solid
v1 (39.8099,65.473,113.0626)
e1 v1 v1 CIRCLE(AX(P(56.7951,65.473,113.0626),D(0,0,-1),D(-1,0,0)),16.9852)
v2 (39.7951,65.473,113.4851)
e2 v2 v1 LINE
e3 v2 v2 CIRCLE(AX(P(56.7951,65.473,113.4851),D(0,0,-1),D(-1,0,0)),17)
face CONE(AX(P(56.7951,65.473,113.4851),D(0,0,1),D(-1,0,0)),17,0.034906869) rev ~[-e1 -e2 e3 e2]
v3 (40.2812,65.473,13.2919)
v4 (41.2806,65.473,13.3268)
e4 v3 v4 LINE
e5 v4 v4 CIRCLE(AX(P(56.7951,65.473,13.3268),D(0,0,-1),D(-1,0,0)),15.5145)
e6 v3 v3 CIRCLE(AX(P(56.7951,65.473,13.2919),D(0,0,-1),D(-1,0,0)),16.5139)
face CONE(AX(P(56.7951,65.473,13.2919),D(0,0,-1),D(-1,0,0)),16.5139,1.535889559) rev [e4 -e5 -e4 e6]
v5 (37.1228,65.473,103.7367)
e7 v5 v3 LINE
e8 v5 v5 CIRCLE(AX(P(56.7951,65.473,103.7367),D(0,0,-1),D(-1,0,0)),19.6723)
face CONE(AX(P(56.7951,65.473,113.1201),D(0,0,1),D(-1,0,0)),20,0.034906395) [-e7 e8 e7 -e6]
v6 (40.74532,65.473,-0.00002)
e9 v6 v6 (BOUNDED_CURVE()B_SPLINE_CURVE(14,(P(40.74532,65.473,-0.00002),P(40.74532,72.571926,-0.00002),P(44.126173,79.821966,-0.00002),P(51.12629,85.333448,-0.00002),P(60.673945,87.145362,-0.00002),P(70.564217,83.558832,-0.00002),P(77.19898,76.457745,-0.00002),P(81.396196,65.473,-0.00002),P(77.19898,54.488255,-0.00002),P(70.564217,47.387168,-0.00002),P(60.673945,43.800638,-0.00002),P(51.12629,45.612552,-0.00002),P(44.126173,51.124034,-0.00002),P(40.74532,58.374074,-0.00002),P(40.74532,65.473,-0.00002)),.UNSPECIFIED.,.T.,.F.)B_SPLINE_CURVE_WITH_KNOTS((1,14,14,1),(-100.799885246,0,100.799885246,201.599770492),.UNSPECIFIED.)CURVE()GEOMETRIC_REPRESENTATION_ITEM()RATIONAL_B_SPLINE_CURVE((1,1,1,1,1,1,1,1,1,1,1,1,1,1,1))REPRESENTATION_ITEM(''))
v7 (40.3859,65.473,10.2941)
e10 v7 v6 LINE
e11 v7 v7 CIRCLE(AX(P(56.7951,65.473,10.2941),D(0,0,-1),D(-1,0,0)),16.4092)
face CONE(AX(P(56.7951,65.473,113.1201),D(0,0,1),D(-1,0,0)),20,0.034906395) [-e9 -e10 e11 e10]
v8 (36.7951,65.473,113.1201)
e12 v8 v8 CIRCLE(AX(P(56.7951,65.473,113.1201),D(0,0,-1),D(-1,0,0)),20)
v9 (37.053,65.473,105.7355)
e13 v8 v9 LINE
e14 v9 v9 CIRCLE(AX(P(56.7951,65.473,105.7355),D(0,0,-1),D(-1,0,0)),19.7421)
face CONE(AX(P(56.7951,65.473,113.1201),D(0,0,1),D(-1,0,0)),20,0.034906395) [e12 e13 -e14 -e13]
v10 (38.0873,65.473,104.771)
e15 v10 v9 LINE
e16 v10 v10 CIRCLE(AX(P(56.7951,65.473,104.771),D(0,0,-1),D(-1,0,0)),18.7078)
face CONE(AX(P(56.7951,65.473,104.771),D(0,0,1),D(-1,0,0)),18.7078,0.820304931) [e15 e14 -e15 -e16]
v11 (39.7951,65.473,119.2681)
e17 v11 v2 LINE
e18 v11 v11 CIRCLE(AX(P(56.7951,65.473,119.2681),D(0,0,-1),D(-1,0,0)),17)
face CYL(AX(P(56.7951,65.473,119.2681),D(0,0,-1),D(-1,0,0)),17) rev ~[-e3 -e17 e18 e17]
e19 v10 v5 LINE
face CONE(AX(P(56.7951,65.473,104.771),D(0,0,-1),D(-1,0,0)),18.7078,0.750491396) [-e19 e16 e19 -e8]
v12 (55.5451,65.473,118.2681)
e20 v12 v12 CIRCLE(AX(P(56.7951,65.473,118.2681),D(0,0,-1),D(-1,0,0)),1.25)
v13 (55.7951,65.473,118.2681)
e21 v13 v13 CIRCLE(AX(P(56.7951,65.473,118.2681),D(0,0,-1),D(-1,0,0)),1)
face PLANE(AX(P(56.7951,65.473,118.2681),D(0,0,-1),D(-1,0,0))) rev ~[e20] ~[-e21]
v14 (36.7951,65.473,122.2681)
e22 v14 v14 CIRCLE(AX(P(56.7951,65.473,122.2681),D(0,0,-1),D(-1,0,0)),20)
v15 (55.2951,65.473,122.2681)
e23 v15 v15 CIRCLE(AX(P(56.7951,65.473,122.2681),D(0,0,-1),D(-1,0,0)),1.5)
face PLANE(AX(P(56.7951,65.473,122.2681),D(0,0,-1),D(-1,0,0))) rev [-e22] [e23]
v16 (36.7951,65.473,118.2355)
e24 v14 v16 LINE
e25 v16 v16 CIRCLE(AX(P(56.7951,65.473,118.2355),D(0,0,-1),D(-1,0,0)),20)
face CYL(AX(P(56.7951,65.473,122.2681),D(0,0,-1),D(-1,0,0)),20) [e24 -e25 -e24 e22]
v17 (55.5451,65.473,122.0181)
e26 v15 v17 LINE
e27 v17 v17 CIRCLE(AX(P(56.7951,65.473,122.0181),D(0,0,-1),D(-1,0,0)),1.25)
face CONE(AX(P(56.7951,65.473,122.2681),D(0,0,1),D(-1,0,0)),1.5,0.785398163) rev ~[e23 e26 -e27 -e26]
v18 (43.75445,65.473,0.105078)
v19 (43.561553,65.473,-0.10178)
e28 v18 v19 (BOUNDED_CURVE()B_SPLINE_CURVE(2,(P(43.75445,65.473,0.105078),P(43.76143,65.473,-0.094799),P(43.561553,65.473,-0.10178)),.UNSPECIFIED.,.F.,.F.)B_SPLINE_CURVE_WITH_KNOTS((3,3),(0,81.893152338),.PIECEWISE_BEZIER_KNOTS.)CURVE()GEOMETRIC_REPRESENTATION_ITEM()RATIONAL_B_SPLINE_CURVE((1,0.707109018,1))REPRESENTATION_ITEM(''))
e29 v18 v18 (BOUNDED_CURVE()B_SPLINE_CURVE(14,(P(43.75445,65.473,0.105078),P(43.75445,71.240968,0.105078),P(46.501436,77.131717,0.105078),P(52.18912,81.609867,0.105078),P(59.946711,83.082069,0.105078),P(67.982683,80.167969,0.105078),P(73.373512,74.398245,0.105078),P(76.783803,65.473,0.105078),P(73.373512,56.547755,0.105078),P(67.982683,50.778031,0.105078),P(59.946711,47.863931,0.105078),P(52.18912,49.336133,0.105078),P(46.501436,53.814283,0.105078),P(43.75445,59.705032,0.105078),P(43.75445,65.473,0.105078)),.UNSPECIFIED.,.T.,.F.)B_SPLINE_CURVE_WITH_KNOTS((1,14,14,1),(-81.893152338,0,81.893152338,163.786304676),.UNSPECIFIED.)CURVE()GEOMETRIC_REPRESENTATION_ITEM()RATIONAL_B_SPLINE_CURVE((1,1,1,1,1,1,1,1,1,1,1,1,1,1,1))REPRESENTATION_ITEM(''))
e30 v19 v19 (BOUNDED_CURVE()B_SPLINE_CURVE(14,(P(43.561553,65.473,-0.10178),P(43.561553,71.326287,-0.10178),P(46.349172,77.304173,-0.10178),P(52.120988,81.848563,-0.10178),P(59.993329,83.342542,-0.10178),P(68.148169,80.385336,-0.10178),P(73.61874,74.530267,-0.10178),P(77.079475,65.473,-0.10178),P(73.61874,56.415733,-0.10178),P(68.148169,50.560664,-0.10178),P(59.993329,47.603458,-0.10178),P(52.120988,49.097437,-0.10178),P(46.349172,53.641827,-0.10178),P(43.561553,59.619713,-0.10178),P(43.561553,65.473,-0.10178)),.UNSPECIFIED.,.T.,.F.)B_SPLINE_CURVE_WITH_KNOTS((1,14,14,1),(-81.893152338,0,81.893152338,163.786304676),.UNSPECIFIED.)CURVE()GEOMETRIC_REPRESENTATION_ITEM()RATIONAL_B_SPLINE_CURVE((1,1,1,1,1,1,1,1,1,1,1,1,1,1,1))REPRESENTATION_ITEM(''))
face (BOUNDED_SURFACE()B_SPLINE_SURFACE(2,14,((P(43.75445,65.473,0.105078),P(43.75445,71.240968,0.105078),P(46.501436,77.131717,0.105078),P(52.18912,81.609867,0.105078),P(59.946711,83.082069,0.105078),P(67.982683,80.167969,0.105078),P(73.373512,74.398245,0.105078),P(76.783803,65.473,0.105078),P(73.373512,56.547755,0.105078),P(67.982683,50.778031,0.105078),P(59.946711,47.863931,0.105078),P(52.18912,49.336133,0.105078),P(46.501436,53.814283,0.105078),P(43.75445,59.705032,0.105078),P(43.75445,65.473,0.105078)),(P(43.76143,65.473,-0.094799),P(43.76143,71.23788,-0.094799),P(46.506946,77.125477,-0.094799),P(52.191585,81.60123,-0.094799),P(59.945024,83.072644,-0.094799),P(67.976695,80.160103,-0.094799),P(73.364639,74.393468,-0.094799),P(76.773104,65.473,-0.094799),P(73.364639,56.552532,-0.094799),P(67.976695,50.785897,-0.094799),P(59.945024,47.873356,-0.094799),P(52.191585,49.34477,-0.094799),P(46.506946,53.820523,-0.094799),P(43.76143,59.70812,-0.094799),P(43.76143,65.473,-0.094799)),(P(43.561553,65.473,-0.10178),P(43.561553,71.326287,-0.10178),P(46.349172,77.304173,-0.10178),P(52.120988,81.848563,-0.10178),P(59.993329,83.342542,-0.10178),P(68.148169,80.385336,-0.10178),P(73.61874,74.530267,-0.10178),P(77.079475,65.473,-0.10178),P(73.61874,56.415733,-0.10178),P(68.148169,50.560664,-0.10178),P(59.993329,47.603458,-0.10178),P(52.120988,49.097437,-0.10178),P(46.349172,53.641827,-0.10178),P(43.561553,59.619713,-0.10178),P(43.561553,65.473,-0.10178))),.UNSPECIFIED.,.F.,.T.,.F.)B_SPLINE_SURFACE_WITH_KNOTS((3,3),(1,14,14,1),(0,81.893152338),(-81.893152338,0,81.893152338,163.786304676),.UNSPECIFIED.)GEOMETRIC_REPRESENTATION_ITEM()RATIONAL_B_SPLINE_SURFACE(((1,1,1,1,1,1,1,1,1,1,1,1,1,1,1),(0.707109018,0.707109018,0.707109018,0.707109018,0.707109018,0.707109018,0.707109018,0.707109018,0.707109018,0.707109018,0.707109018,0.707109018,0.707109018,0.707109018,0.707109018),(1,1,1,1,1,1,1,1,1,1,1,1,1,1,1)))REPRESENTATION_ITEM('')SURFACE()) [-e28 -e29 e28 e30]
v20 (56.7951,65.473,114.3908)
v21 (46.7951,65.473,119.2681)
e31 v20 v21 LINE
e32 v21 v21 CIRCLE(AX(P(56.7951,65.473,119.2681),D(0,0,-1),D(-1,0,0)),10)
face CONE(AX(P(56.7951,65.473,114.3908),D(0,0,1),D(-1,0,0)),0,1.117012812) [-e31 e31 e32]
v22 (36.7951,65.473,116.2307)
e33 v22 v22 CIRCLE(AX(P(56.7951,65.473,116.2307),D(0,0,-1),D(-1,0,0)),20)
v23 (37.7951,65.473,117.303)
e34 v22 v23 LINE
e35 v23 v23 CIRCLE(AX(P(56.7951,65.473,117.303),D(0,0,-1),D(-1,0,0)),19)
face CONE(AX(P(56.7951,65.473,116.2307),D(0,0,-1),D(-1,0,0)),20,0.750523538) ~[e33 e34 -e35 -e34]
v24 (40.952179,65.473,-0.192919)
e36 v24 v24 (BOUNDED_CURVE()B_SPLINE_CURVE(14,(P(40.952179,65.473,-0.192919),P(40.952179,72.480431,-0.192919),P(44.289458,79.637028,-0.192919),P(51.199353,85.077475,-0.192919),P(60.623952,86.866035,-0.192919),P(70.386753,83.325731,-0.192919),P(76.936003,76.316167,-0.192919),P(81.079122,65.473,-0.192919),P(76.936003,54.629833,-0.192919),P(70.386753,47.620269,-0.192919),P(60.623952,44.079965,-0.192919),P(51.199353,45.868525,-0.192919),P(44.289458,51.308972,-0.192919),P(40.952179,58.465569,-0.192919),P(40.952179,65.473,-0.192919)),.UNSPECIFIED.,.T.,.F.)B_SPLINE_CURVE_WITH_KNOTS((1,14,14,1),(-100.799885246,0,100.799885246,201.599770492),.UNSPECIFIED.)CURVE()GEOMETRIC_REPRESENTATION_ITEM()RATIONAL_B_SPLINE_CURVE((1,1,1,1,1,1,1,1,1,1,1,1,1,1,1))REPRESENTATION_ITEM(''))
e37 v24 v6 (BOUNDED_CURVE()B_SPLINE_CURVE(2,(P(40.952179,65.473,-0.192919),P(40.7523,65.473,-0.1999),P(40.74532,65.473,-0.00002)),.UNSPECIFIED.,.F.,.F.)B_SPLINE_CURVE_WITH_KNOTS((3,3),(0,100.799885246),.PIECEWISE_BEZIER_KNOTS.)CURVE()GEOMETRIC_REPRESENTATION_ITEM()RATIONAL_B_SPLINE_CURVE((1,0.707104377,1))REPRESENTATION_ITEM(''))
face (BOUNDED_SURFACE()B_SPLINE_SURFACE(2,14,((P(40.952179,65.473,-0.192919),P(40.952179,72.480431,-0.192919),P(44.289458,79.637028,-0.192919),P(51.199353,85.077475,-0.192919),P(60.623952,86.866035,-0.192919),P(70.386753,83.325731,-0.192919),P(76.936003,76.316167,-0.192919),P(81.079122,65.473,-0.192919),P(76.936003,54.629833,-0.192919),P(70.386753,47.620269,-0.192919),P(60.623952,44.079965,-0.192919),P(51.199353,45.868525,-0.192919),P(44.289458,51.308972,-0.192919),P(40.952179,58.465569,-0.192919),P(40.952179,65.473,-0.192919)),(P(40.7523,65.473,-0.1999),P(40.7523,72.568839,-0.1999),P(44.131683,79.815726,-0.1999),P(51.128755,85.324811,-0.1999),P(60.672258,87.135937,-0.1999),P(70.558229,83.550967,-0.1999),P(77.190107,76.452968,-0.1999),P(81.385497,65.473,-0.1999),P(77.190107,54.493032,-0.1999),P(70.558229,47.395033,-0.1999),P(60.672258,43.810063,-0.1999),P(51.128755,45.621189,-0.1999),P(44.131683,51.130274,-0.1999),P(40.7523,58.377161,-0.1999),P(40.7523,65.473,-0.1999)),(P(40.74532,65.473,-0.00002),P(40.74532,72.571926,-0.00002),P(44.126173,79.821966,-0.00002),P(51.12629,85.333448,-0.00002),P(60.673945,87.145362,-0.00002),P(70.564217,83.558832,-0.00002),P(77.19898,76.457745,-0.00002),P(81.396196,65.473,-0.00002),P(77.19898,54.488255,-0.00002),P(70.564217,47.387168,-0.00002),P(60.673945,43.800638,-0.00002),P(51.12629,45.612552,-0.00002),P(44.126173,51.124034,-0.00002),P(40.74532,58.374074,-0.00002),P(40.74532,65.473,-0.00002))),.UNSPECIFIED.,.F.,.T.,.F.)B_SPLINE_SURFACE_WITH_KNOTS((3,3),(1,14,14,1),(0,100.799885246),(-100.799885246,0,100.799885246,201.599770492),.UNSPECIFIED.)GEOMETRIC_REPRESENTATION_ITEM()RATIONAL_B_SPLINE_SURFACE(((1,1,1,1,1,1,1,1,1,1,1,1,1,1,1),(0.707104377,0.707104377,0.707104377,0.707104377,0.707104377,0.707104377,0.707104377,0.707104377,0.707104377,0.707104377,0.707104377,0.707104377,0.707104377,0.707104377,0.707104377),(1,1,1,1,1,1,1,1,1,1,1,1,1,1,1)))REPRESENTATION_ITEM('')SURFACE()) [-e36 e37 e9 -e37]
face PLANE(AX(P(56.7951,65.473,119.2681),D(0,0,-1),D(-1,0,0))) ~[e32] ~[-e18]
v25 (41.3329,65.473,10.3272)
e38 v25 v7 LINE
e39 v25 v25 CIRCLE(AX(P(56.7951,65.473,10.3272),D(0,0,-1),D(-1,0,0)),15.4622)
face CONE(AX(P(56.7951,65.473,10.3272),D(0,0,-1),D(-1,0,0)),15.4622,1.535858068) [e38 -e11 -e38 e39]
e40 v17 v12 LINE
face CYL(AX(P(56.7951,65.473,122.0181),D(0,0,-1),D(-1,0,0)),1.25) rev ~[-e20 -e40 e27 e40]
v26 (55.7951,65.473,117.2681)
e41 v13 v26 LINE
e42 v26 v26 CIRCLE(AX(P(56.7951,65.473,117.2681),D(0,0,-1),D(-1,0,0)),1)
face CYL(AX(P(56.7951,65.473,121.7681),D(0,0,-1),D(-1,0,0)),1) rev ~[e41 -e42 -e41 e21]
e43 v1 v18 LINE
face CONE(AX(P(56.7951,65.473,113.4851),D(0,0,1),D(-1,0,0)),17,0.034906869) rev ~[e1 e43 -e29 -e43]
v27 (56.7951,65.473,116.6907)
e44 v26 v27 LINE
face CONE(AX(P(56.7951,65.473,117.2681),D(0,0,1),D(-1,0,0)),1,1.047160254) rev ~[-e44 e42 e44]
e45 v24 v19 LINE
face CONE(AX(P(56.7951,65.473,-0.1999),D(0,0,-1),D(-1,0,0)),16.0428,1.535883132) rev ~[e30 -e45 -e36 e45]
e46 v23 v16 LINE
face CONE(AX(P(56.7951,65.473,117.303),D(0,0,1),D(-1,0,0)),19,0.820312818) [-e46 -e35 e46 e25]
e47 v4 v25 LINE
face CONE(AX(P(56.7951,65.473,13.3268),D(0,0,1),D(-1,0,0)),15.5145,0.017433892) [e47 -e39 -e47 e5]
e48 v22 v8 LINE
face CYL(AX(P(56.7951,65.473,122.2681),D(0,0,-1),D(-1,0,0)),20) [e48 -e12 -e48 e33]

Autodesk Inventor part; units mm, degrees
ref_plane "YZ Plane" through (0, 0, 0) normal (1, 0, 0) x (0, 1, 0)
ref_plane "XZ Plane" through (0, 0, 0) normal (0, 1, 0) x (-1, 0, 0)
ref_plane "XY Plane" through (0, 0, 0) normal (0, 0, 1) x (1, 0, 0)
sketch "Sketch1" plane through (0, 0, 0) normal (1, 0, 0) x (0, 1, 0)
  line L0 (-20, 0) -> (122.468, 0)
  line L1 (0, 0) -> (0, -20)
  line L2 (0, -20) -> (9.148, -20)
  line L3 (9.148, -20) -> (122.468, -16.0428)
  line L4 (122.468, 0) -> (122.468, -16.0428)
  line L5 (3, -10) -> (3, -17)
  line L6 (7.8773, 0) -> (3, -10)
  line L7 (7.8773, 0) -> (19.0033, 0) construction
  line L8 (9.2055, 0) -> (9.2055, -16.9852)
  line L9 (8.783, -17) -> (122.468, -13.03)
  line L10 (3, -17) -> (8.783, -17)
  line L11 (122.468, -16.0428) -> (122.3629, -13.0337)
  line L12 (6.0374, -20) -> (4.9651, -19)
  line L13 (4.9651, -19) -> (4.0326, -20)
  line L14 (4.9651, -19) -> (5, -20)
  line L15 (17.532, -19.7072) -> (17.4971, -18.7078)
  line L16 (17.4971, -18.7078) -> (18.5314, -19.6723)
  line L17 (17.4971, -18.7078) -> (16.5326, -19.7421)
  line L18 (111.974, -16.4092) -> (108.9762, -16.5139)
  line L19 (108.9762, -16.5139) -> (108.9413, -15.5145)
  line L20 (108.9413, -15.5145) -> (111.9409, -15.4622)
  line L21 (111.9409, -15.4622) -> (111.974, -16.4092)
  line L22 (0.5, 0) -> (0.5, -1)
  line L23 (0, -1.5) -> (0.5, -1)
  line L24 (0.5, -1) -> (5, -1)
  line L25 (5, -1) -> (5.5774, 0)
  line L26 (0.25, -1.25) -> (4, -1.25)
  line L27 (4, -1.25) -> (4, 0)
  point P0 (4, -1)
  dimension "d1" = 20
  dimension "d5" = 3
  dimension "d18" = 90
  dimension "d22" = 5
  dimension "d23" = 1
  dimension "d24" = 1
  dimension "d25" = 105
  dimension "d26" = 3
  dimension "d27" = 1
  dimension "d28" = 13.5
  dimension "d43" = 88
revolve "Revolution1" add sketch "Sketch1" angle 360 about axis through (0, -20, 0) along (0, 1, 0) contours L23 L26 L27 L24 L25 L0 L6 L5 L10 L9 L11 L3 L21 L20 L19 L16 L17 L2 L12 L13 L1
fillet "Fillet1" radius 0.2 2 edges at (0, 122.468, 16.0428) (0, 122.3629, 13.0337)
thread "Thread2" size "M2.5x0.45" class "6H" standard "ANSI Metric M Profile" length 3.5
move or copy body "Поворот1" bodies to move or copy 1 copy no rotation origin (0, 0, 0) rotation axis (0, 0, 1) rotation angle -90 translate (-65.473, 65.473, 0)
move or copy body "Поворот2" bodies to move or copy 1 copy no rotation origin (0, 0, 0) rotation axis (0, 1, 0) rotation angle 90 translate (56.7951, 0, 56.7951)
properties material "Aluminum 2014-T6"
